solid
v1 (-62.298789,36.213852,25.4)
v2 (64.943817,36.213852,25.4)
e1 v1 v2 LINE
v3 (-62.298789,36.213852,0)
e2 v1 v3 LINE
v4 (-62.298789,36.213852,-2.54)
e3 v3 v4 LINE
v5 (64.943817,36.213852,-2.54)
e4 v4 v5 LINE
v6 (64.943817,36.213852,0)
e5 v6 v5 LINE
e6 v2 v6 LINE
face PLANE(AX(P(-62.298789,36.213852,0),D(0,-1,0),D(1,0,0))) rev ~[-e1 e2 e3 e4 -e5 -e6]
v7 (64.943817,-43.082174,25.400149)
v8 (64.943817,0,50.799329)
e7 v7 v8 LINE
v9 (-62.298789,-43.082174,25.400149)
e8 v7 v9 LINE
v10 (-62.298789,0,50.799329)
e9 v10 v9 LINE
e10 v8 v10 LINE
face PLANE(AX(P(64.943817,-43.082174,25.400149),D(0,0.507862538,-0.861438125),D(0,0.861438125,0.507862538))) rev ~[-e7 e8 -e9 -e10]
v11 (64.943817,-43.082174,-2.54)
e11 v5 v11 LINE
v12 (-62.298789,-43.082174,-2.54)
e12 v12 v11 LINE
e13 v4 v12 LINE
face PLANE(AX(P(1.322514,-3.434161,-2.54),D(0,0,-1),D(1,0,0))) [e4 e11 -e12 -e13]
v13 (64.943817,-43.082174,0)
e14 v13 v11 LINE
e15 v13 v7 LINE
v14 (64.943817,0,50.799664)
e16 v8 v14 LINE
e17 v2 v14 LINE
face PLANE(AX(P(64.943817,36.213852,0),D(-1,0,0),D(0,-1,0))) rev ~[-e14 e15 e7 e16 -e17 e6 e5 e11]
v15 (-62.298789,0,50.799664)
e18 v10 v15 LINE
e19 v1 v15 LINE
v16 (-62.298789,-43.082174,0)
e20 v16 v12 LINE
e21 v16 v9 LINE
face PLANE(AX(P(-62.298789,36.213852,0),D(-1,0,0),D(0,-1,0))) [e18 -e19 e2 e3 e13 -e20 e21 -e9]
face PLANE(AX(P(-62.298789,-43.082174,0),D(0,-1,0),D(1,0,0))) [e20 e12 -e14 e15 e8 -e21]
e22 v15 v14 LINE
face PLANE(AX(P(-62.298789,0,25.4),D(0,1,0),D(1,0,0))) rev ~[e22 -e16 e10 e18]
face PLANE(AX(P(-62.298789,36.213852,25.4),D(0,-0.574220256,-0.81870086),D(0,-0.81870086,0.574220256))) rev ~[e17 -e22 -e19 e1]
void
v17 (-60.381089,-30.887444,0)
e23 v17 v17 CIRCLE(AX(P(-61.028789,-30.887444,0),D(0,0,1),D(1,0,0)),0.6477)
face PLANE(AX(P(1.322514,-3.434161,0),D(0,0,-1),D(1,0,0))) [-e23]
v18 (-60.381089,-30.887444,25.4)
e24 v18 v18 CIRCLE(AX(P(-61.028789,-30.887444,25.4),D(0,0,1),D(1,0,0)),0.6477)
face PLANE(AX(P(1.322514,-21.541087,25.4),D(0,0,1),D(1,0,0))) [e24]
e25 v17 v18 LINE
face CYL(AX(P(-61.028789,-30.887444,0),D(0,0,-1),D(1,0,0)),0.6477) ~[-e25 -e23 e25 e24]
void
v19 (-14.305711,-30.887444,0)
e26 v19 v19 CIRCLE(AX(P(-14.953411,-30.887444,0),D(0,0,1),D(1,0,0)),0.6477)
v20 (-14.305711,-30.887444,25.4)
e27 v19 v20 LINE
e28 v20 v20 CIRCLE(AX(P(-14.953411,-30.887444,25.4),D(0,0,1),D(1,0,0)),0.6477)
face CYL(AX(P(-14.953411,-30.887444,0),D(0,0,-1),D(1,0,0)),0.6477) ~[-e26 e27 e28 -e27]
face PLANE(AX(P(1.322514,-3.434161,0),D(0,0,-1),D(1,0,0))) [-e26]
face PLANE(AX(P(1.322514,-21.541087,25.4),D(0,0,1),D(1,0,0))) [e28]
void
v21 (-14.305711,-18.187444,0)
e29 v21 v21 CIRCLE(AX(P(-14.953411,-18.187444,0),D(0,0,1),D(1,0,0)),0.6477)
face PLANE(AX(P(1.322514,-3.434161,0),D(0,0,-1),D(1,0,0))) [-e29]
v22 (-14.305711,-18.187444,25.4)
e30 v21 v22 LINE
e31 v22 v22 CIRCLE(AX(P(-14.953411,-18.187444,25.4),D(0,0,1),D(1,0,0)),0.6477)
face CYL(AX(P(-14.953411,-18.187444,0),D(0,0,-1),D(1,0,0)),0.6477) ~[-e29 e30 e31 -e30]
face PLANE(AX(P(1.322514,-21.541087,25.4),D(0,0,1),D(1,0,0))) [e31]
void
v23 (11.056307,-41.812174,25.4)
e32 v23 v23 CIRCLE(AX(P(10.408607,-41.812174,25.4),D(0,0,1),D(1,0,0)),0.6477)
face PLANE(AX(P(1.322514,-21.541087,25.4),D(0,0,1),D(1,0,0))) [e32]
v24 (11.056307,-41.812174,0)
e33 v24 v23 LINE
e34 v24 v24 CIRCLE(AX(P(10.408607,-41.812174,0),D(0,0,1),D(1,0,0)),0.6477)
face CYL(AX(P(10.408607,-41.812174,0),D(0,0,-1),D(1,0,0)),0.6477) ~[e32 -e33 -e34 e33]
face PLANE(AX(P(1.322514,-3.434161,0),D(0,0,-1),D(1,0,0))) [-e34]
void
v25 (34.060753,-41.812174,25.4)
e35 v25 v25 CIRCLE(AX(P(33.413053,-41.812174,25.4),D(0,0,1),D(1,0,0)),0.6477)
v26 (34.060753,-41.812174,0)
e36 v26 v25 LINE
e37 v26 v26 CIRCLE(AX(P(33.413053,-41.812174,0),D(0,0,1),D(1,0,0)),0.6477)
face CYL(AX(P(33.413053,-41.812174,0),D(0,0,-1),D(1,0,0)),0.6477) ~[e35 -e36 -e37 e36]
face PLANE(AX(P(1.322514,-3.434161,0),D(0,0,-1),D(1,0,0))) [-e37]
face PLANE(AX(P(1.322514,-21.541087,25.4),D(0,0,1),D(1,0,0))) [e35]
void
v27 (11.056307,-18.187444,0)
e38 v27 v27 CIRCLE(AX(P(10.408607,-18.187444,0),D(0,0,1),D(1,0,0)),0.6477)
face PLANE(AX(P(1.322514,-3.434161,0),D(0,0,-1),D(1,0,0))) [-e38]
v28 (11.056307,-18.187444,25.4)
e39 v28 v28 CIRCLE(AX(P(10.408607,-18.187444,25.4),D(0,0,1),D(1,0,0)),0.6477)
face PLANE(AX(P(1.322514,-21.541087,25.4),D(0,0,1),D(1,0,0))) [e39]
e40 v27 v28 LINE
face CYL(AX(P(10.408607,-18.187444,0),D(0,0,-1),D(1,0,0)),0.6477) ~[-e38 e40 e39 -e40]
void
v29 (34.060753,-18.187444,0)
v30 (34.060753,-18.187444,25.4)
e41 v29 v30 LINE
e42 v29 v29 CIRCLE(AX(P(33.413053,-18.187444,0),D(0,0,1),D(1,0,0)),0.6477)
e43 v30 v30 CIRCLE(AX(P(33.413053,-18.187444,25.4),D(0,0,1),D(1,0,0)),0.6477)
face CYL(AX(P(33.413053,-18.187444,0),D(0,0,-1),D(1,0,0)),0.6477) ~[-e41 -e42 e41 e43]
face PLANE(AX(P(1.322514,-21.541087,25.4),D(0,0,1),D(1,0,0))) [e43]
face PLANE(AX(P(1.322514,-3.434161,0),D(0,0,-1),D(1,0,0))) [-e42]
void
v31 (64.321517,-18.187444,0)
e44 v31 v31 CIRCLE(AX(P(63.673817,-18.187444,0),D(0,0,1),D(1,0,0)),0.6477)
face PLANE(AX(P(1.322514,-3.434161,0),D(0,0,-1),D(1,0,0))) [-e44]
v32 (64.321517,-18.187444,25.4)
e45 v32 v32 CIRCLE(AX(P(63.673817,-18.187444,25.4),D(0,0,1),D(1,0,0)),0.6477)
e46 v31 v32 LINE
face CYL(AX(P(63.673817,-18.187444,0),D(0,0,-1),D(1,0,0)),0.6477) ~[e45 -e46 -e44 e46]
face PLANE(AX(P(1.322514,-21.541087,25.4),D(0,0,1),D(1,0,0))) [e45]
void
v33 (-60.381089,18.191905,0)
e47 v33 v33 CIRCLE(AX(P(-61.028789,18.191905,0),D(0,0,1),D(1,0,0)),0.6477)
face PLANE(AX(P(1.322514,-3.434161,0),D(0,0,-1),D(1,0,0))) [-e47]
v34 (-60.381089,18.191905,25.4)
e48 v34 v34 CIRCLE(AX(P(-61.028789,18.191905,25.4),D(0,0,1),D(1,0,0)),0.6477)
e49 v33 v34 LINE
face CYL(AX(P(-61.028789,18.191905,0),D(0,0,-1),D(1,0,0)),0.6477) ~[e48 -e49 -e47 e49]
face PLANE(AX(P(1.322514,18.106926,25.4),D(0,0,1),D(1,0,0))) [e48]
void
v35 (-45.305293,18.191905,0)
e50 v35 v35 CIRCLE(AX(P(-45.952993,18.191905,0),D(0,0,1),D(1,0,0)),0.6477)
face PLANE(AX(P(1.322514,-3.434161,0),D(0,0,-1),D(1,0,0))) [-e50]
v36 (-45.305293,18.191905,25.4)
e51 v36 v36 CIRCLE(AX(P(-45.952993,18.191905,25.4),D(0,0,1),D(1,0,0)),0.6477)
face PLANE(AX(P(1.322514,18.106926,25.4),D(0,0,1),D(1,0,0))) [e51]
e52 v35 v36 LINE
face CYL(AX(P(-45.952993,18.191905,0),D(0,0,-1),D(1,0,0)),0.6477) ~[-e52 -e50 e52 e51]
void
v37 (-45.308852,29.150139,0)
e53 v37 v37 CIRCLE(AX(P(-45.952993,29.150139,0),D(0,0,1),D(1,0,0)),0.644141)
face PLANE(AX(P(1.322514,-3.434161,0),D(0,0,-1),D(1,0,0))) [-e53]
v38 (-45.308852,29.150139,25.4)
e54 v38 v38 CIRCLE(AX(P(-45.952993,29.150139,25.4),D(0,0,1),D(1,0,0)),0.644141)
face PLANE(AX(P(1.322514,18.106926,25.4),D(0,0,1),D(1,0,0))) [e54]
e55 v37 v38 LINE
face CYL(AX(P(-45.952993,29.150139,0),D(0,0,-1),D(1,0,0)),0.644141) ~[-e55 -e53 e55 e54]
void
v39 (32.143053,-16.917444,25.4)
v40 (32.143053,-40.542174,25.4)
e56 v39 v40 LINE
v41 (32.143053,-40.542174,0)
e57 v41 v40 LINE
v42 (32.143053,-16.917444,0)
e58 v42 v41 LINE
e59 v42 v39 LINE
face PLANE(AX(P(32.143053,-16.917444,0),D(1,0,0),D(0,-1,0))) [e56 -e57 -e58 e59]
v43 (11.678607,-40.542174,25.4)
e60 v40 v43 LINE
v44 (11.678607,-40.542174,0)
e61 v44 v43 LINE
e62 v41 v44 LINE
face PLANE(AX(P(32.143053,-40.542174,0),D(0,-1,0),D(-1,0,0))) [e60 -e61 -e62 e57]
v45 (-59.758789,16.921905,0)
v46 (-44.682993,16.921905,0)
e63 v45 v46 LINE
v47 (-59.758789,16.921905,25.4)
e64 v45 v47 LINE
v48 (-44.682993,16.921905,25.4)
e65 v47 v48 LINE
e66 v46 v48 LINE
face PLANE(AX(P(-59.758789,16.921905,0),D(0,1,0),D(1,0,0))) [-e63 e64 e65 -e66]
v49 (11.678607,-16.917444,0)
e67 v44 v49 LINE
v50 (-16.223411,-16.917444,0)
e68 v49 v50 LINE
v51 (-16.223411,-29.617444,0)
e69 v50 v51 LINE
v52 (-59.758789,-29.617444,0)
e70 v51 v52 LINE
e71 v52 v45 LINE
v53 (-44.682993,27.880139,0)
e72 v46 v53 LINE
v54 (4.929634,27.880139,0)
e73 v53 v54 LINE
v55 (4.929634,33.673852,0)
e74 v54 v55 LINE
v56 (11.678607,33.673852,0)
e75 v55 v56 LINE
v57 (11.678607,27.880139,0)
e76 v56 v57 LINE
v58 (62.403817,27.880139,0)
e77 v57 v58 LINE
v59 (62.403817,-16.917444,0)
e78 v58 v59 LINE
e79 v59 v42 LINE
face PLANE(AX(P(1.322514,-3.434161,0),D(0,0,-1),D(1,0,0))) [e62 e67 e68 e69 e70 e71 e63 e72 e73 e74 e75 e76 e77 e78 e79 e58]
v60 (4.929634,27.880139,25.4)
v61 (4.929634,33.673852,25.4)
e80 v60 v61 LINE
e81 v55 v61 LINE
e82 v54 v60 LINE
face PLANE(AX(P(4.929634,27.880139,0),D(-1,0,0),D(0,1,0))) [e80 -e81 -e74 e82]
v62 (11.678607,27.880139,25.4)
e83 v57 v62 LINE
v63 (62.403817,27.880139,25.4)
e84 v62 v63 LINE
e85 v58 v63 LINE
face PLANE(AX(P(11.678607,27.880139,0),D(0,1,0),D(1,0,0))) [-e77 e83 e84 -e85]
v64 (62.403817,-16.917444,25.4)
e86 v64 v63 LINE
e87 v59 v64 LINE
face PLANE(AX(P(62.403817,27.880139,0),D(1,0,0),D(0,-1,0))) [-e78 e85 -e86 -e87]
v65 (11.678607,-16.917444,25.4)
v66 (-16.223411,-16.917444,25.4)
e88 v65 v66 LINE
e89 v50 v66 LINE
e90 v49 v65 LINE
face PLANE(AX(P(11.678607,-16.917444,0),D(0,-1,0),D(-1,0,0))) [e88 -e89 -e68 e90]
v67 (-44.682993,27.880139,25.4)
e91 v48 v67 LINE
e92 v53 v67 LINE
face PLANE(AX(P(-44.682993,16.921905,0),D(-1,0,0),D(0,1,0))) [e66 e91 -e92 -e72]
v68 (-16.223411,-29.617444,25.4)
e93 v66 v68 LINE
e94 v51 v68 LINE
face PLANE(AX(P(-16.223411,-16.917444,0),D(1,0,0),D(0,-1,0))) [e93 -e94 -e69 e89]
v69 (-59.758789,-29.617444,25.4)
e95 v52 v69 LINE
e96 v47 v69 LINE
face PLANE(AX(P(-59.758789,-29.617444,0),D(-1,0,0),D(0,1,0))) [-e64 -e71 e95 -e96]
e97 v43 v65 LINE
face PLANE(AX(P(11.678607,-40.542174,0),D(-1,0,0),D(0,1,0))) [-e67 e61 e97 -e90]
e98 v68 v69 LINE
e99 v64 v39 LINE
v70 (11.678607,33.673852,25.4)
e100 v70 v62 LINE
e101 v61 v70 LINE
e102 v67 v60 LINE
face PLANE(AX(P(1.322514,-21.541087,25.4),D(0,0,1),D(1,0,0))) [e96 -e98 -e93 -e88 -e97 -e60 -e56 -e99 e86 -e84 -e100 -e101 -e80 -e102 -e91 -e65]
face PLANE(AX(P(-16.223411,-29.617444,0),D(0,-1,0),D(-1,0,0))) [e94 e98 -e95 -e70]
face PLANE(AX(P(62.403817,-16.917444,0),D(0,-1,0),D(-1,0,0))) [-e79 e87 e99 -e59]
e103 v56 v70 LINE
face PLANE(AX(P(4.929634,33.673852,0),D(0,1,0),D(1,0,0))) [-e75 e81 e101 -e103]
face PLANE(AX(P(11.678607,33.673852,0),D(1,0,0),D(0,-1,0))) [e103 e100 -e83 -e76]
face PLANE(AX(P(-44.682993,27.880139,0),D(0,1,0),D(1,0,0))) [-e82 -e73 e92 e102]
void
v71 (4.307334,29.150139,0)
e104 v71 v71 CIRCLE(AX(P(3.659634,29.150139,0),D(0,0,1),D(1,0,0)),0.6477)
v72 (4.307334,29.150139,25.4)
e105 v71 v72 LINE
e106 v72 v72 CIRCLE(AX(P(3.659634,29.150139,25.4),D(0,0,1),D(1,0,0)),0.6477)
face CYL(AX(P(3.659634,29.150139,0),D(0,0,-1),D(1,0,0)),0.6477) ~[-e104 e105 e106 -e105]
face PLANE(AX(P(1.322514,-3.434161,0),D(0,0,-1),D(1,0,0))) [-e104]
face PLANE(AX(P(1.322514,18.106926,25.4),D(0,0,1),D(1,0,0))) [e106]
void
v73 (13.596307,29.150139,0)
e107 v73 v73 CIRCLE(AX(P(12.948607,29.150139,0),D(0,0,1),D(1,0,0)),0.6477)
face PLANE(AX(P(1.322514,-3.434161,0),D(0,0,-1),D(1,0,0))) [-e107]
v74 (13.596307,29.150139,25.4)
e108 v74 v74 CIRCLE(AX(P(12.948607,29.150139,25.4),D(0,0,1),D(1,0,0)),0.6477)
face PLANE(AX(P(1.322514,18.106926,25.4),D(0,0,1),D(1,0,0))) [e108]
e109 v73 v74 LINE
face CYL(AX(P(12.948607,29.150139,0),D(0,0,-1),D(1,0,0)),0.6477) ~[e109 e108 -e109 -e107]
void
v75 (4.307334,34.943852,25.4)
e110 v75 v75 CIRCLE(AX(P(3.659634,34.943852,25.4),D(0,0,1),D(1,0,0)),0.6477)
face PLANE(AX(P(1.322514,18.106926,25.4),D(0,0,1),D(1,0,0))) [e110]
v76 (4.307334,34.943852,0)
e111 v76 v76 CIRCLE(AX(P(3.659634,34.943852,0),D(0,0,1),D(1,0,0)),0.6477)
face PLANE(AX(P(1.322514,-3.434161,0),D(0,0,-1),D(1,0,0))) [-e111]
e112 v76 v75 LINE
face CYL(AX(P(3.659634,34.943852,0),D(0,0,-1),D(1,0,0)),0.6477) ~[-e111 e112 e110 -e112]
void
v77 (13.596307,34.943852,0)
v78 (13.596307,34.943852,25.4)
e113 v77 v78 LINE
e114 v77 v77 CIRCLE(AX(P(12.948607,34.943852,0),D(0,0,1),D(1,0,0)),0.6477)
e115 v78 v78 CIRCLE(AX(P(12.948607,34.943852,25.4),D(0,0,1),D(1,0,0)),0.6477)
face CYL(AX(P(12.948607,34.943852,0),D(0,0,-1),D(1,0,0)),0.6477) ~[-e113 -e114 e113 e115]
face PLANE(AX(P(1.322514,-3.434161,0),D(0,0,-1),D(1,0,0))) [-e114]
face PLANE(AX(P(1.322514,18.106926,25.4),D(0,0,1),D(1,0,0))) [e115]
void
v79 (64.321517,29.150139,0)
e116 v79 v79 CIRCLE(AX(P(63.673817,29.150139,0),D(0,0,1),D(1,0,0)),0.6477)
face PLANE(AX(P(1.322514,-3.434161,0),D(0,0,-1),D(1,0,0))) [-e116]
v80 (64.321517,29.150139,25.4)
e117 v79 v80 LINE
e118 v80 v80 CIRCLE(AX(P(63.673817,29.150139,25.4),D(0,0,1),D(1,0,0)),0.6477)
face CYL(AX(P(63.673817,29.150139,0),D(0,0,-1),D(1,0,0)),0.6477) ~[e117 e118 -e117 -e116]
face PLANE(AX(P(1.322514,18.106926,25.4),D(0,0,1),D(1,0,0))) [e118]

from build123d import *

# Parameters (mm, degrees)
F0_R      = 0.6477
F0_R_2    = 0.6441405576
F1_DEPTH  = 25.4
F2_W      = 127.2426065671
F2_H      = 43.082173756
F3_DEPTH  = 25.4
F6_DEPTH  = 127.2436065671
F7_W      = 127.2426065671
F7_H      = 36.2138515522
F8_DEPTH  = 25.4
F11_DEPTH = 127.2436065671
F12_W     = 127.2426065671
F12_H     = 79.2960253082
F13_DEPTH = 2.54


# Not quite as in the source:
# - ends of sketch curves that miss each other by under 0.0002 mm in the source are joined


with BuildPart() as f1:
    # F0 (on Top) → F1 (new body)
    with BuildSketch(Plane.XY):
        Polygon((-47.2229928794, 27.8801387091), (-47.2229928794, 30.4201387091), (-44.6829928794, 30.4201387091), (2.3896338216, 30.4201387091), (2.3896338216, 33.6738515522), (2.3896338216, 36.2138515522), (-62.2987892685, 36.2138515522), (-62.2987892685, 19.4619052569), (-59.7587892685, 19.4619052569), (-47.2229928794, 19.4619052569), align=None)
        Polygon((-44.6829928794, 30.4201387091), (-47.2229928794, 30.4201387091), (-47.2229928794, 27.8801387091), (-47.2229928794, 19.4619052569), (-59.7587892685, 19.4619052569), (-62.2987892685, 19.4619052569), (-62.2987892685, 16.9219052569), (-62.2987892685, -29.6174437481), (-62.2987892685, -32.1574437481), (-59.7587892685, -32.1574437481), (-16.2234111885, -32.1574437481), (-13.6834111885, -32.1574437481), (-13.6834111885, -29.6174437481), (-13.6834111885, -19.4574437481), (9.1386072609, -19.4574437481), (9.1386072609, -40.542173756), (9.1386072609, -43.082173756), (11.6786072609, -43.082173756), (32.1430532363, -43.082173756), (34.6830532363, -43.082173756), (34.6830532363, -40.542173756), (34.6830532363, -19.4574437481), (62.4038172987, -19.4574437481), (62.4038172987, -16.9174437481), (34.6830532363, -16.9174437481), (32.1430532363, -16.9174437481), (32.1430532363, -19.4574437481), (32.1430532363, -40.542173756), (11.6786072609, -40.542173756), (11.6786072609, -19.4574437481), (11.6786072609, -16.9174437481), (9.1386072609, -16.9174437481), (-13.6834111885, -16.9174437481), (-16.2234111885, -16.9174437481), (-16.2234111885, -19.4574437481), (-16.2234111885, -29.6174437481), (-59.7587892685, -29.6174437481), (-59.7587892685, 1.3920115222), (-59.7587892685, 2.6620115222), (-59.7587892685, 16.9219052569), (-47.2229928794, 16.9219052569), (-45.9529928794, 16.9219052569), (-44.6829928794, 16.9219052569), (-44.6829928794, 19.4619052569), (-44.6829928794, 27.8801387091), (2.3896338216, 27.8801387091), (4.9296338216, 27.8801387091), (4.9296338216, 30.4201387091), (4.9296338216, 33.6738515522), (11.6786072609, 33.6738515522), (11.6786072609, 30.4201387091), (11.6786072609, 27.8801387091), (14.2186072609, 27.8801387091), (62.4038172987, 27.8801387091), (62.4038172987, 30.4201387091), (14.2186072609, 30.4201387091), (14.2186072609, 33.6738515522), (14.2186072609, 36.2138515522), (11.6786072609, 36.2138515522), (4.9296338216, 36.2138515522), (2.3896338216, 36.2138515522), (2.3896338216, 33.6738515522), (2.3896338216, 30.4201387091), align=None)
        with Locations((-61.0287892685, -30.8874437481)):
            Circle(F0_R, mode=Mode.SUBTRACT)
        with Locations((-14.9534111885, -30.8874437481)):
            Circle(F0_R, mode=Mode.SUBTRACT)
        with Locations((-14.9534111885, -18.1874437481)):
            Circle(F0_R, mode=Mode.SUBTRACT)
        with Locations((10.4086072609, -41.812173756)):
            Circle(F0_R, mode=Mode.SUBTRACT)
        with Locations((33.4130532363, -41.812173756)):
            Circle(F0_R, mode=Mode.SUBTRACT)
        with Locations((10.4086072609, -18.1874437481)):
            Circle(F0_R, mode=Mode.SUBTRACT)
        with Locations((33.4130532363, -18.1874437481)):
            Circle(F0_R, mode=Mode.SUBTRACT)
        with Locations((-61.0287892685, 18.1919052569)):
            Circle(F0_R, mode=Mode.SUBTRACT)
        with Locations((-45.9529928794, 18.1919052569)):
            Circle(F0_R, mode=Mode.SUBTRACT)
        with Locations((-45.9529928794, 29.1501387091)):
            Circle(F0_R_2, mode=Mode.SUBTRACT)
        with Locations((3.6596338216, 29.1501387091)):
            Circle(F0_R, mode=Mode.SUBTRACT)
        with Locations((12.9486072609, 29.1501387091)):
            Circle(F0_R, mode=Mode.SUBTRACT)
        with Locations((3.6596338216, 34.9438515522)):
            Circle(F0_R, mode=Mode.SUBTRACT)
        with Locations((12.9486072609, 34.9438515522)):
            Circle(F0_R, mode=Mode.SUBTRACT)
        Polygon((64.9438172987, 36.2138515522), (14.2186072609, 36.2138515522), (14.2186072609, 33.6738515522), (14.2186072609, 30.4201387091), (62.4038172987, 30.4201387091), (64.9438172987, 30.4201387091), align=None)
        Polygon((-59.7587892685, -32.1574437481), (-62.2987892685, -32.1574437481), (-62.2987892685, -43.082173756), (9.1386072609, -43.082173756), (9.1386072609, -40.542173756), (9.1386072609, -19.4574437481), (-13.6834111885, -19.4574437481), (-13.6834111885, -29.6174437481), (-13.6834111885, -32.1574437481), (-16.2234111885, -32.1574437481), align=None)
        Polygon((64.9438172987, 27.8801387091), (64.9438172987, 30.4201387091), (62.4038172987, 30.4201387091), (62.4038172987, 27.8801387091), (62.4038172987, 2.6620115222), (62.4038172987, 1.3920115222), (62.4038172987, -16.9174437481), (62.4038172987, -19.4574437481), (64.9438172987, -19.4574437481), (64.9438172987, -16.9174437481), align=None)
        with Locations((63.6738172987, -18.1874437481)):
            Circle(F0_R, mode=Mode.SUBTRACT)
        with Locations((63.6738172987, 29.1501387091)):
            Circle(F0_R, mode=Mode.SUBTRACT)
        Polygon((64.9438172987, -43.082173756), (64.9438172987, -19.4574437481), (62.4038172987, -19.4574437481), (34.6830532363, -19.4574437481), (34.6830532363, -40.542173756), (34.6830532363, -43.082173756), align=None)
    extrude(amount=F1_DEPTH)

    # F2 (on face) → F3 (join)
    with BuildSketch(Plane.XY.offset(25.4)):
        with Locations((1.3225140151, -21.541086878)):
            Rectangle(F2_W, F2_H)
    extrude(amount=F3_DEPTH)

    # F5 (on face) → F6 (cut, through all)
    with BuildSketch(Plane.YZ.offset(64.9438172987)):
        Polygon((-43.082173756, 50.8), (-43.082173756, 25.4001487046), (0, 50.7993288338), (0, 50.8), align=None)
    extrude(amount=-F6_DEPTH, mode=Mode.SUBTRACT)

    # F7 (on face) → F8 (join)
    with BuildSketch(Plane.XY.offset(25.4)):
        with Locations((1.3225140151, 18.1069257761)):
            Rectangle(F7_W, F7_H)
    extrude(amount=F8_DEPTH)

    # F9 (on face) → F11 (cut, through all)
    with BuildSketch(Plane(origin=(-62.2987892685, 0, 0), x_dir=(0, -1, 0), z_dir=(-1, 0, 0))):
        Polygon((-36.2138515522, 25.4), (0, 50.7996644169), (0, 50.8), (-36.2138515522, 50.8), align=None)
    extrude(amount=-F11_DEPTH, mode=Mode.SUBTRACT)

    # F12 (on face) → F13 (join)
    with BuildSketch(Plane(origin=(0, 0, 0), x_dir=(1, 0, 0), z_dir=(0, 0, -1))):
        with Locations((1.3225140151, 3.4341611019)):
            Rectangle(F12_W, F12_H)
    extrude(amount=F13_DEPTH)


solid = f1.part
